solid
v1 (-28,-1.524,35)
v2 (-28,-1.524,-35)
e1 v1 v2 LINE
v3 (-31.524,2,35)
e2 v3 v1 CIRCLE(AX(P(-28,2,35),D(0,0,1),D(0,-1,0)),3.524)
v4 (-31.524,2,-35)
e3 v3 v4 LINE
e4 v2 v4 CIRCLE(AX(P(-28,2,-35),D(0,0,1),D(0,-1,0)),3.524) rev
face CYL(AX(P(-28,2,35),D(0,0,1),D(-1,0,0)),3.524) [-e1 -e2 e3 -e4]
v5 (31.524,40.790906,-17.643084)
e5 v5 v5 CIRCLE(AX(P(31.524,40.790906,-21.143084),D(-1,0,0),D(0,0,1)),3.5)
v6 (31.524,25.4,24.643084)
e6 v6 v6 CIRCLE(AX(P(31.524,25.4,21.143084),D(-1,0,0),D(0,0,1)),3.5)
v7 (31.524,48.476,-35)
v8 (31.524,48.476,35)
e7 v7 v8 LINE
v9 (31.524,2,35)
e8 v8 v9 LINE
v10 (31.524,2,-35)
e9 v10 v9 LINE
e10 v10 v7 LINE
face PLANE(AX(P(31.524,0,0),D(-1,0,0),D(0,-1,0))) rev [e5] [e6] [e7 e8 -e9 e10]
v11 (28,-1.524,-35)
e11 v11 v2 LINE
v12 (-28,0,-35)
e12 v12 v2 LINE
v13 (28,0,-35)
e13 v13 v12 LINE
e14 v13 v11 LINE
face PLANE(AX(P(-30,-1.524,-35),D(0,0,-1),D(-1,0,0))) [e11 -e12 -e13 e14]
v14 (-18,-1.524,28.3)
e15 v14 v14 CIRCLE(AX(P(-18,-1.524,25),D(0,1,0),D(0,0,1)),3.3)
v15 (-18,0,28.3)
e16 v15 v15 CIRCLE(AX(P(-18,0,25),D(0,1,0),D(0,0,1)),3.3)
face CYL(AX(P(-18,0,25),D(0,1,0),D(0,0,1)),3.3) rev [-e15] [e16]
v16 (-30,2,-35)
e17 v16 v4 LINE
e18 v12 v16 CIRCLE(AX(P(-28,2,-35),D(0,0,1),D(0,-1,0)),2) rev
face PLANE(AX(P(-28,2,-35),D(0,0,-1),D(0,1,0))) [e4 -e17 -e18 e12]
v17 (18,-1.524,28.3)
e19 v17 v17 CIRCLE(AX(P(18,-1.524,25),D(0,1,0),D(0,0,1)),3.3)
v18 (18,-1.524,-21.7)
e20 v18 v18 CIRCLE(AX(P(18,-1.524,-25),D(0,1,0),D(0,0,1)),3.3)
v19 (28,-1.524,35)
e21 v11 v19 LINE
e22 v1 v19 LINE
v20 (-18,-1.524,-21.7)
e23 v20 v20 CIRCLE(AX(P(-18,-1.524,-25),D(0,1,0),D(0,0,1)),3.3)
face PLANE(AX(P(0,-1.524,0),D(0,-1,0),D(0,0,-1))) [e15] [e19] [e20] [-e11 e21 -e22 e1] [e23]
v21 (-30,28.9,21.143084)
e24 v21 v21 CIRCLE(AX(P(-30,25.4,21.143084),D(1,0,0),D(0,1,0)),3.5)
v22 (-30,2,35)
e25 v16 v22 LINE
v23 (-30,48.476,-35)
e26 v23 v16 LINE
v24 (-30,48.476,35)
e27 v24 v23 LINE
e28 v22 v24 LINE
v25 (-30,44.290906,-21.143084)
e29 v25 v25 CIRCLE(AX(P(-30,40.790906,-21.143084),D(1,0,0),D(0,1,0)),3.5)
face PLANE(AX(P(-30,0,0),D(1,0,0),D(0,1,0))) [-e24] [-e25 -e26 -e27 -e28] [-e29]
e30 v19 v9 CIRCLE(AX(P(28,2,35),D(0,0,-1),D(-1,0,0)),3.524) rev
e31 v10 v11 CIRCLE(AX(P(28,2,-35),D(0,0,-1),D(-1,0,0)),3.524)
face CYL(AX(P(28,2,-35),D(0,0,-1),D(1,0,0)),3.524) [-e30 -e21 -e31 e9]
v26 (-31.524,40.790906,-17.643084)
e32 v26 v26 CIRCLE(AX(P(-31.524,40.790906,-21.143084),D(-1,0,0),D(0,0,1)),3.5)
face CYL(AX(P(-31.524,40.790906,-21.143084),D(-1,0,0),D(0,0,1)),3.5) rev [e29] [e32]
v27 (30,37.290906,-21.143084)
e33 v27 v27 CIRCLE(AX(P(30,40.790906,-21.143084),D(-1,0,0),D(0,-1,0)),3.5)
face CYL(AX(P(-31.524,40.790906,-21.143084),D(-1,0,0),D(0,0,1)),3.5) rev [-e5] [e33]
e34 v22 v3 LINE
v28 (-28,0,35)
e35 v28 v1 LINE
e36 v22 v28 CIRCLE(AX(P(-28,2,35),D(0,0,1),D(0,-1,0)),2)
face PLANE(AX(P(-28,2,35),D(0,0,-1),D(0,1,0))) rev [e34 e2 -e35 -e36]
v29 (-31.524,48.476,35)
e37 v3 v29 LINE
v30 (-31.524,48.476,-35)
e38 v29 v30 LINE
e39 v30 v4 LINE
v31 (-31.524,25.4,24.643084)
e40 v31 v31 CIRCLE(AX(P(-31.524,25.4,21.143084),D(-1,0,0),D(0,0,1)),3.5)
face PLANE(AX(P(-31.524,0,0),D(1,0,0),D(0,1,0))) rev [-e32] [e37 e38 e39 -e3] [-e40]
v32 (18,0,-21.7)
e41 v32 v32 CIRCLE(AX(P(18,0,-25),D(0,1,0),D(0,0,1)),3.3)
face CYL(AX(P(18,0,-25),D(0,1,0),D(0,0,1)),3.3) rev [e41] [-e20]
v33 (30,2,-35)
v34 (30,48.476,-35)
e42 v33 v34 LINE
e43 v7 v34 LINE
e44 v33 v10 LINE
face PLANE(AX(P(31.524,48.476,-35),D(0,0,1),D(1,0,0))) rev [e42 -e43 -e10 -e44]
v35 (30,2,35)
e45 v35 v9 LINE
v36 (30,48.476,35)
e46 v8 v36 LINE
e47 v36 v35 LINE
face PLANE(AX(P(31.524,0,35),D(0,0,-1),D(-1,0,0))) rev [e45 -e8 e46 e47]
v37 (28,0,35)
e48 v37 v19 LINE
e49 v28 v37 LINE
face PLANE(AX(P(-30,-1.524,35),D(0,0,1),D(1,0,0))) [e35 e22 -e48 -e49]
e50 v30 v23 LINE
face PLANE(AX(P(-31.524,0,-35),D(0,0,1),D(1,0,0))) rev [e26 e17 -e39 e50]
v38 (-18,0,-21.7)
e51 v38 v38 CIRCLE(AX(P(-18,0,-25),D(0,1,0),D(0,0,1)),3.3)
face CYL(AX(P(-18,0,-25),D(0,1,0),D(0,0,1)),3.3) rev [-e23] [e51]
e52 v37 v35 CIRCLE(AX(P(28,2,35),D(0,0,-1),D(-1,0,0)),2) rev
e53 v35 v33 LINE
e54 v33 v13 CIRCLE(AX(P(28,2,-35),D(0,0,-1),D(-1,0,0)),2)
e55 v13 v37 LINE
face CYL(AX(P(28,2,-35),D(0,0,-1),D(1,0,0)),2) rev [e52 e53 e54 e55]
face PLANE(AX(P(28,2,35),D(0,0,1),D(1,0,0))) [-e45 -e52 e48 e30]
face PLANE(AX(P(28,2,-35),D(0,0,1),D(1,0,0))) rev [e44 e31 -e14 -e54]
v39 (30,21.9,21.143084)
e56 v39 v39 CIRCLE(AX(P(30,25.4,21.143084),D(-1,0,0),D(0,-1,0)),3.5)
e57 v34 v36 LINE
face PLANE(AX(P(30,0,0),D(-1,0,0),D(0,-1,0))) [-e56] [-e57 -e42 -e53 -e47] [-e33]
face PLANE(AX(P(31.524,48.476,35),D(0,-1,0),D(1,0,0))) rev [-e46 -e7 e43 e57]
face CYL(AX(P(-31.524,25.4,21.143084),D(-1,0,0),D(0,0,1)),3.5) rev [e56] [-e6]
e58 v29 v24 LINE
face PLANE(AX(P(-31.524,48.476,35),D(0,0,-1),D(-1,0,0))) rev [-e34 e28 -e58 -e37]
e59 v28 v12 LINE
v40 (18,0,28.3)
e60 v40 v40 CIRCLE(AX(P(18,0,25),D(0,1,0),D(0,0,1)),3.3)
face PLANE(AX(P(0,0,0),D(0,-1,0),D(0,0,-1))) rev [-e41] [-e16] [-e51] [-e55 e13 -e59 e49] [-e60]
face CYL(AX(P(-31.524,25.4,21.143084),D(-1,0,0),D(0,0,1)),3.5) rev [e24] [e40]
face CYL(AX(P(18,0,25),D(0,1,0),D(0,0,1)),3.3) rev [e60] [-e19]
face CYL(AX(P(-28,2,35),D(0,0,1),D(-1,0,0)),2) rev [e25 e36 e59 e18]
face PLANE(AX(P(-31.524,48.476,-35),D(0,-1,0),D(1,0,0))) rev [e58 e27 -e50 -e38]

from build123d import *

# Parameters (mm, degrees)
SKETCH1_W                      = 60
SKETCH1_H                      = 70
BASE_FLANGE3_DEPTH             = 1.524
EDGE_FLANGE1_STRIP_W           = 10.096
EDGE_FLANGE1_STRIP_H           = 1.524
EDGE_FLANGE1_STRIP_CUT_DEPTH   = 70
EDGE_FLANGE1_STRIP_2_W         = 10.096
EDGE_FLANGE1_STRIP_2_H         = 1.524
EDGE_FLANGE1_STRIP_CUT_2_DEPTH = 70
EDGE_FLANGE1_DEPTH             = 70
EDGE_FLANGE1_BEND_DEPTH        = 70
F_7_0_7_DIAMETER_HOLE1_D       = 7
M6_CLEARANCE_HOLE1_D           = 6.6


# Sheet-metal steps are written as plain solids
with BuildPart() as part:
    # Sketch1 → Base-Flange3 (new body)
    with BuildSketch(Plane(origin=(0, 0, 0), x_dir=(1, 0, 0), z_dir=(0, 1, 0))):
        Rectangle(SKETCH1_W, SKETCH1_H)
    extrude(amount=-BASE_FLANGE3_DEPTH)

    # Edge-Flange1 strip (across the edge) → Edge-Flange1 strip cut (cut)
    with BuildSketch(Plane(origin=(-30, 0, -35), x_dir=(1, 0, 0), z_dir=(0, 0, 1))):
        with Locations((-3.048, -0.762)):
            Rectangle(EDGE_FLANGE1_STRIP_W, EDGE_FLANGE1_STRIP_H)
    extrude(amount=EDGE_FLANGE1_STRIP_CUT_DEPTH, mode=Mode.SUBTRACT)

    # Edge-Flange1 strip 2 (across the edge) → Edge-Flange1 strip cut 2 (cut)
    with BuildSketch(Plane(origin=(30, 0, 35), x_dir=(-1, 0, 0), z_dir=(0, 0, -1))):
        with Locations((-3.048, -0.762)):
            Rectangle(EDGE_FLANGE1_STRIP_2_W, EDGE_FLANGE1_STRIP_2_H)
    extrude(amount=EDGE_FLANGE1_STRIP_CUT_2_DEPTH, mode=Mode.SUBTRACT)

    # Edge-Flange1 section (across the edge) → Edge-Flange1 (add)
    with BuildSketch(Plane(origin=(-30, 0, -35), x_dir=(1, 0, 0), z_dir=(0, 0, 1))):
        with BuildLine():
            Line((-1.524, 2), (-1.524, 48.476))
            Line((-1.524, 48.476), (0, 48.476))
            Line((0, 48.476), (0, 2))
            ThreePointArc((0, 2), (0.585786438, 0.585786438), (2, 0))
            Line((2, 0), (2, -1.524))
            ThreePointArc((2, -1.524), (-0.491844297, -0.491844297), (-1.524, 2))
        make_face()
    extrude(amount=EDGE_FLANGE1_DEPTH)

    # Edge-Flange1 section 2 (across the edge) → Edge-Flange1 bend (add)
    with BuildSketch(Plane(origin=(30, 0, 35), x_dir=(-1, 0, 0), z_dir=(0, 0, -1))):
        with BuildLine():
            Line((-1.524, 2), (-1.524, 48.476))
            Line((-1.524, 48.476), (0, 48.476))
            Line((0, 48.476), (0, 2))
            ThreePointArc((0, 2), (0.585786438, 0.585786438), (2, 0))
            Line((2, 0), (2, -1.524))
            ThreePointArc((2, -1.524), (-0.491844297, -0.491844297), (-1.524, 2))
        make_face()
    extrude(amount=EDGE_FLANGE1_BEND_DEPTH)

    # Ø7.0 (7) Diameter Hole1 (through all)
    with Locations(Plane.ZY.offset(31.524)):
        with Locations((21.143083968, 25.4), (-21.143083968, 40.79090645)):
            Hole(F_7_0_7_DIAMETER_HOLE1_D / 2)

    # M6 Clearance Hole1 (through all)
    with Locations(Plane(origin=(0, 0, 0), x_dir=(1, 0, 0), z_dir=(0, 1, 0))):
        with Locations((-18, -25), (18, -25), (18, 25), (-18, 25)):
            Hole(M6_CLEARANCE_HOLE1_D / 2)


solid = part.part
